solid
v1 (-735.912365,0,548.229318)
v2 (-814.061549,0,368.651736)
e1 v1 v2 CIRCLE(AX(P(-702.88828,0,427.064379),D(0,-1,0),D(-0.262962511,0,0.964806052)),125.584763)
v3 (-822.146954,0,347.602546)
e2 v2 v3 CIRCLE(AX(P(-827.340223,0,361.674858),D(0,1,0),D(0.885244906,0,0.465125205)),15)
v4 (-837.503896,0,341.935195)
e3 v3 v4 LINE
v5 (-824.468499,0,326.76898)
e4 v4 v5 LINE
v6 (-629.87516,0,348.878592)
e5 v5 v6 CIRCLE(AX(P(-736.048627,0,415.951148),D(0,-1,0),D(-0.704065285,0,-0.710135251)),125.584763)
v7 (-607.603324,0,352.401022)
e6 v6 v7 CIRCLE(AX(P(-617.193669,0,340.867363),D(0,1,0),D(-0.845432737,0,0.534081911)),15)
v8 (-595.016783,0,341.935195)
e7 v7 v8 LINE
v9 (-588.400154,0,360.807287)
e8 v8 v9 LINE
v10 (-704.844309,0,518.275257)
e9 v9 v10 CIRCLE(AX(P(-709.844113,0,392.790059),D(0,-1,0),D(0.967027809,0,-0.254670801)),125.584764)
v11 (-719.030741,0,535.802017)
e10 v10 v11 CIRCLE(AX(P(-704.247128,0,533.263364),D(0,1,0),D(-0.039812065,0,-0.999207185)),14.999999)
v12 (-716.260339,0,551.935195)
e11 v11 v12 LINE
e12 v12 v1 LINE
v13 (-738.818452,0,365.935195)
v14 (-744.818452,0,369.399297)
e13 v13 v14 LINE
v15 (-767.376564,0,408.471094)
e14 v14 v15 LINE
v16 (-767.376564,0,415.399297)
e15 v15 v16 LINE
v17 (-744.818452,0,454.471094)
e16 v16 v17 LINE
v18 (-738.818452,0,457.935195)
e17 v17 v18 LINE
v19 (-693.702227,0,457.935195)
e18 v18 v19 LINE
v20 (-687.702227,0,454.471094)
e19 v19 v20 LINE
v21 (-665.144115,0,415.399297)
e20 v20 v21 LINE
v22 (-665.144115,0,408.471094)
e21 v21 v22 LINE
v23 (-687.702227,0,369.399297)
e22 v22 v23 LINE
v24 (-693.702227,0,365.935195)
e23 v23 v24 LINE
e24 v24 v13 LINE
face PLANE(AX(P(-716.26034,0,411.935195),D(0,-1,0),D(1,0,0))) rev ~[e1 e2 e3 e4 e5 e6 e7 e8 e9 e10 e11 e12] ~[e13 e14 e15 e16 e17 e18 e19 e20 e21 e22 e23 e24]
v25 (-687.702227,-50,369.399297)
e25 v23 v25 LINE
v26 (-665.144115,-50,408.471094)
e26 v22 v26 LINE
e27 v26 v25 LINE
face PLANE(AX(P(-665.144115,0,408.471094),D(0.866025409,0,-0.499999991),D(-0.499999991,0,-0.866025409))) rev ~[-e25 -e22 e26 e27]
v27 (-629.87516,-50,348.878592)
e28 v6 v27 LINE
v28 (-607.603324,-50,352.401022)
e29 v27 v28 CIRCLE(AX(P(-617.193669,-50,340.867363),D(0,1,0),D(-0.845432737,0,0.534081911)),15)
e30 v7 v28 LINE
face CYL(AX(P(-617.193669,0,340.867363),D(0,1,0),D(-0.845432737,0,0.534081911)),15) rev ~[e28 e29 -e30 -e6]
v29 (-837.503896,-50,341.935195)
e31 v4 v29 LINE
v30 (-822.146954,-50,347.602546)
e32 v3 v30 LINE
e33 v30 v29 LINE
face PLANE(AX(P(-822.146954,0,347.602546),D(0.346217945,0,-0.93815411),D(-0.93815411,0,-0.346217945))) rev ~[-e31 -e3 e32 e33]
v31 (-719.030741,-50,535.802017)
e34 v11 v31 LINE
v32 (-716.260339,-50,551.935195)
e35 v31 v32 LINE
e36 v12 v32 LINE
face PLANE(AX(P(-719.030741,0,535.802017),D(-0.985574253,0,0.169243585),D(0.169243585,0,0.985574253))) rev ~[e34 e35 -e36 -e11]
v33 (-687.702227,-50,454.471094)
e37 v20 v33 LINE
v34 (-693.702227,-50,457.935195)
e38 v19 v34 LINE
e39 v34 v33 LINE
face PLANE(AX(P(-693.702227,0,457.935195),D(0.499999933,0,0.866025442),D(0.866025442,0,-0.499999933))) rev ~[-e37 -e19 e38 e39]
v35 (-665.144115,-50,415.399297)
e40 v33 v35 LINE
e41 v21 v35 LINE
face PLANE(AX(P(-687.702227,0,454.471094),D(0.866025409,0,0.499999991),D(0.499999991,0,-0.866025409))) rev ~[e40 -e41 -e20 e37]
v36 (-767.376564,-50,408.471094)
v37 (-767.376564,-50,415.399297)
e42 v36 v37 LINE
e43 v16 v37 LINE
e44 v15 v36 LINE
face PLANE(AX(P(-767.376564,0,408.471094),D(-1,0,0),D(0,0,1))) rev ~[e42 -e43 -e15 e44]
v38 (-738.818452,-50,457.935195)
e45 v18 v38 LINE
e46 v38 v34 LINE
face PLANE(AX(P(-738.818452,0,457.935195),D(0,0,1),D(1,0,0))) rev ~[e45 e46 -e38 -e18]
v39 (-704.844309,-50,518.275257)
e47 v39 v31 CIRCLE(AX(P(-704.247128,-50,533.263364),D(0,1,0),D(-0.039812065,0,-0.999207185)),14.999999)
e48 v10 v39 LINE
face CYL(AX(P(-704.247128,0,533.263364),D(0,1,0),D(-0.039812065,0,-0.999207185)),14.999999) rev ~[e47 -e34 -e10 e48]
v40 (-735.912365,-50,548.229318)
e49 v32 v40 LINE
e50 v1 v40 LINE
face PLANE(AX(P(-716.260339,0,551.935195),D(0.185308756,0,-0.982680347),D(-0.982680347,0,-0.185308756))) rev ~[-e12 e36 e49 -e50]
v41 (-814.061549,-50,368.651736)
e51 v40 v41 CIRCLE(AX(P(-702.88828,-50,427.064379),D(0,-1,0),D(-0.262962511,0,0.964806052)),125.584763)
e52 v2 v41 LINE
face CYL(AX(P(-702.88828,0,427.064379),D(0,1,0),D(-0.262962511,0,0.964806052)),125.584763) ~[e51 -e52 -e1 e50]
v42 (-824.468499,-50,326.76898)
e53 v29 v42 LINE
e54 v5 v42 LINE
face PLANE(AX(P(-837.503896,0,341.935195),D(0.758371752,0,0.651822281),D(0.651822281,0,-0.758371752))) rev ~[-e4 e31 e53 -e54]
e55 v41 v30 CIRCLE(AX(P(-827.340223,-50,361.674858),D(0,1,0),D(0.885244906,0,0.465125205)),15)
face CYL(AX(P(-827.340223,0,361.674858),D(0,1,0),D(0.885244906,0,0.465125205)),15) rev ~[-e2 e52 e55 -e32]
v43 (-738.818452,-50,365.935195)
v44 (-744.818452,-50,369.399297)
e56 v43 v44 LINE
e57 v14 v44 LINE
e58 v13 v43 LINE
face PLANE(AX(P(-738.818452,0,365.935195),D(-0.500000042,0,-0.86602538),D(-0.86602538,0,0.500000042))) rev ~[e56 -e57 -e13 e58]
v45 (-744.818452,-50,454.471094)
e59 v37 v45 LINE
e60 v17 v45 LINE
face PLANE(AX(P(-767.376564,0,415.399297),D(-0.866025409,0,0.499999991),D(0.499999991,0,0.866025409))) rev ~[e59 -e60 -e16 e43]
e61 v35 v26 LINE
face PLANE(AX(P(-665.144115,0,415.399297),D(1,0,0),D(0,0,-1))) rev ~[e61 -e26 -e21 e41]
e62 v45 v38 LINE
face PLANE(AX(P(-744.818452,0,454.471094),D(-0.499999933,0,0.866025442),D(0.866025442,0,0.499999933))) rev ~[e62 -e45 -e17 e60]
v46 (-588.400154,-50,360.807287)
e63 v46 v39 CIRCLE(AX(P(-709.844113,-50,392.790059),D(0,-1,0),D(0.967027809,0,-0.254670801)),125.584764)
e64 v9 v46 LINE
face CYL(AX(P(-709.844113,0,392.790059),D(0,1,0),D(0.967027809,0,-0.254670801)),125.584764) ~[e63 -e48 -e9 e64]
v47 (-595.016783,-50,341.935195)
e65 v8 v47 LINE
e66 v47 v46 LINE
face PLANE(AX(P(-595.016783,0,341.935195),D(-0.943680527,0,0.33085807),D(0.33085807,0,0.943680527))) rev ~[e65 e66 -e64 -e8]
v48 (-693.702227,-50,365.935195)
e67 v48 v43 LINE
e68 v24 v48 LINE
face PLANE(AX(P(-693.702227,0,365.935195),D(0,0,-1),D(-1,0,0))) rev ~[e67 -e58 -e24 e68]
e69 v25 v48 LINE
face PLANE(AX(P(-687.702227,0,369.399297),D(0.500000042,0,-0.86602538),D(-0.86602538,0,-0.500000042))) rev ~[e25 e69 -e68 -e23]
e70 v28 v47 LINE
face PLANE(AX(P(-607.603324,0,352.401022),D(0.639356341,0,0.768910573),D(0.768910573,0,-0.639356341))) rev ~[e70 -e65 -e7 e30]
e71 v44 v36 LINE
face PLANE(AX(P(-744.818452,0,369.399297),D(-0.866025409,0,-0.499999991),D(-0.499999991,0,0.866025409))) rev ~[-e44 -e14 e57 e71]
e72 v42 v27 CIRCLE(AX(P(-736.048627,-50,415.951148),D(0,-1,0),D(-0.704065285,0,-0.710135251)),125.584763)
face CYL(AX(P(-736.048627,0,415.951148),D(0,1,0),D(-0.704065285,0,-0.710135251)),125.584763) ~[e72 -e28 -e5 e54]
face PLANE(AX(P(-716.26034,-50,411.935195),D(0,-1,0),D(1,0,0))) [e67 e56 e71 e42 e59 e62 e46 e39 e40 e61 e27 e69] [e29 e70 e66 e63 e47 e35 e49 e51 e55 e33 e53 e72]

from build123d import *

# Parameters (mm, degrees)
F1_DEPTH = 50


# Not quite as in the source:
# - ends of sketch curves that miss each other by under 0.0002 mm in the source are joined


with BuildPart() as f1:
    # F0 (on Front) → F1 (new body)
    with BuildSketch(Plane.XZ):
        with BuildLine():
            Line((-719.030741, 535.802017), (-716.260339, 551.935195))
            Line((-716.260339, 551.935195), (-735.912365, 548.229318))
            ThreePointArc((-735.912365, 548.229318), (-818.0414227516, 477.1771162339), (-814.0615494377, 368.65173577))
            ThreePointArc((-814.0615494377, 368.65173577), (-813.3377138775, 356.2962207865), (-822.1469540915, 347.602546248))
            Line((-822.1469540915, 347.602546248), (-837.503896, 341.935195))
            Line((-837.503896, 341.935195), (-824.468499, 326.76898))
            ThreePointArc((-824.468499, 326.76898), (-721.8709589722, 291.1692315288), (-629.8751597113, 348.8785918176))
            ThreePointArc((-629.8751597113, 348.8785918176), (-619.5368877345, 355.6832101227), (-607.6033241523, 352.4010218168))
            Line((-607.6033241523, 352.4010218168), (-595.016783, 341.935195))
            Line((-595.016783, 341.935195), (-588.400154, 360.807287))
            ThreePointArc((-588.400154, 360.807287), (-608.868637199, 467.4592376194), (-704.8443090013, 518.2752569674))
            ThreePointArc((-704.8443090013, 518.2752569674), (-715.9064175677, 523.8261534239), (-719.030741, 535.802017))
        make_face()
        Polygon((-767.376564, 415.399297), (-744.818452, 454.471094), (-738.818452, 457.935195), (-693.702227, 457.935195), (-687.702227, 454.471094), (-665.144115, 415.399297), (-665.144115, 408.471094), (-687.702227, 369.399297), (-693.702227, 365.935195), (-738.818452, 365.935195), (-744.818452, 369.399297), (-767.376564, 408.471094), align=None, mode=Mode.SUBTRACT)
    extrude(amount=F1_DEPTH)


solid = f1.part
